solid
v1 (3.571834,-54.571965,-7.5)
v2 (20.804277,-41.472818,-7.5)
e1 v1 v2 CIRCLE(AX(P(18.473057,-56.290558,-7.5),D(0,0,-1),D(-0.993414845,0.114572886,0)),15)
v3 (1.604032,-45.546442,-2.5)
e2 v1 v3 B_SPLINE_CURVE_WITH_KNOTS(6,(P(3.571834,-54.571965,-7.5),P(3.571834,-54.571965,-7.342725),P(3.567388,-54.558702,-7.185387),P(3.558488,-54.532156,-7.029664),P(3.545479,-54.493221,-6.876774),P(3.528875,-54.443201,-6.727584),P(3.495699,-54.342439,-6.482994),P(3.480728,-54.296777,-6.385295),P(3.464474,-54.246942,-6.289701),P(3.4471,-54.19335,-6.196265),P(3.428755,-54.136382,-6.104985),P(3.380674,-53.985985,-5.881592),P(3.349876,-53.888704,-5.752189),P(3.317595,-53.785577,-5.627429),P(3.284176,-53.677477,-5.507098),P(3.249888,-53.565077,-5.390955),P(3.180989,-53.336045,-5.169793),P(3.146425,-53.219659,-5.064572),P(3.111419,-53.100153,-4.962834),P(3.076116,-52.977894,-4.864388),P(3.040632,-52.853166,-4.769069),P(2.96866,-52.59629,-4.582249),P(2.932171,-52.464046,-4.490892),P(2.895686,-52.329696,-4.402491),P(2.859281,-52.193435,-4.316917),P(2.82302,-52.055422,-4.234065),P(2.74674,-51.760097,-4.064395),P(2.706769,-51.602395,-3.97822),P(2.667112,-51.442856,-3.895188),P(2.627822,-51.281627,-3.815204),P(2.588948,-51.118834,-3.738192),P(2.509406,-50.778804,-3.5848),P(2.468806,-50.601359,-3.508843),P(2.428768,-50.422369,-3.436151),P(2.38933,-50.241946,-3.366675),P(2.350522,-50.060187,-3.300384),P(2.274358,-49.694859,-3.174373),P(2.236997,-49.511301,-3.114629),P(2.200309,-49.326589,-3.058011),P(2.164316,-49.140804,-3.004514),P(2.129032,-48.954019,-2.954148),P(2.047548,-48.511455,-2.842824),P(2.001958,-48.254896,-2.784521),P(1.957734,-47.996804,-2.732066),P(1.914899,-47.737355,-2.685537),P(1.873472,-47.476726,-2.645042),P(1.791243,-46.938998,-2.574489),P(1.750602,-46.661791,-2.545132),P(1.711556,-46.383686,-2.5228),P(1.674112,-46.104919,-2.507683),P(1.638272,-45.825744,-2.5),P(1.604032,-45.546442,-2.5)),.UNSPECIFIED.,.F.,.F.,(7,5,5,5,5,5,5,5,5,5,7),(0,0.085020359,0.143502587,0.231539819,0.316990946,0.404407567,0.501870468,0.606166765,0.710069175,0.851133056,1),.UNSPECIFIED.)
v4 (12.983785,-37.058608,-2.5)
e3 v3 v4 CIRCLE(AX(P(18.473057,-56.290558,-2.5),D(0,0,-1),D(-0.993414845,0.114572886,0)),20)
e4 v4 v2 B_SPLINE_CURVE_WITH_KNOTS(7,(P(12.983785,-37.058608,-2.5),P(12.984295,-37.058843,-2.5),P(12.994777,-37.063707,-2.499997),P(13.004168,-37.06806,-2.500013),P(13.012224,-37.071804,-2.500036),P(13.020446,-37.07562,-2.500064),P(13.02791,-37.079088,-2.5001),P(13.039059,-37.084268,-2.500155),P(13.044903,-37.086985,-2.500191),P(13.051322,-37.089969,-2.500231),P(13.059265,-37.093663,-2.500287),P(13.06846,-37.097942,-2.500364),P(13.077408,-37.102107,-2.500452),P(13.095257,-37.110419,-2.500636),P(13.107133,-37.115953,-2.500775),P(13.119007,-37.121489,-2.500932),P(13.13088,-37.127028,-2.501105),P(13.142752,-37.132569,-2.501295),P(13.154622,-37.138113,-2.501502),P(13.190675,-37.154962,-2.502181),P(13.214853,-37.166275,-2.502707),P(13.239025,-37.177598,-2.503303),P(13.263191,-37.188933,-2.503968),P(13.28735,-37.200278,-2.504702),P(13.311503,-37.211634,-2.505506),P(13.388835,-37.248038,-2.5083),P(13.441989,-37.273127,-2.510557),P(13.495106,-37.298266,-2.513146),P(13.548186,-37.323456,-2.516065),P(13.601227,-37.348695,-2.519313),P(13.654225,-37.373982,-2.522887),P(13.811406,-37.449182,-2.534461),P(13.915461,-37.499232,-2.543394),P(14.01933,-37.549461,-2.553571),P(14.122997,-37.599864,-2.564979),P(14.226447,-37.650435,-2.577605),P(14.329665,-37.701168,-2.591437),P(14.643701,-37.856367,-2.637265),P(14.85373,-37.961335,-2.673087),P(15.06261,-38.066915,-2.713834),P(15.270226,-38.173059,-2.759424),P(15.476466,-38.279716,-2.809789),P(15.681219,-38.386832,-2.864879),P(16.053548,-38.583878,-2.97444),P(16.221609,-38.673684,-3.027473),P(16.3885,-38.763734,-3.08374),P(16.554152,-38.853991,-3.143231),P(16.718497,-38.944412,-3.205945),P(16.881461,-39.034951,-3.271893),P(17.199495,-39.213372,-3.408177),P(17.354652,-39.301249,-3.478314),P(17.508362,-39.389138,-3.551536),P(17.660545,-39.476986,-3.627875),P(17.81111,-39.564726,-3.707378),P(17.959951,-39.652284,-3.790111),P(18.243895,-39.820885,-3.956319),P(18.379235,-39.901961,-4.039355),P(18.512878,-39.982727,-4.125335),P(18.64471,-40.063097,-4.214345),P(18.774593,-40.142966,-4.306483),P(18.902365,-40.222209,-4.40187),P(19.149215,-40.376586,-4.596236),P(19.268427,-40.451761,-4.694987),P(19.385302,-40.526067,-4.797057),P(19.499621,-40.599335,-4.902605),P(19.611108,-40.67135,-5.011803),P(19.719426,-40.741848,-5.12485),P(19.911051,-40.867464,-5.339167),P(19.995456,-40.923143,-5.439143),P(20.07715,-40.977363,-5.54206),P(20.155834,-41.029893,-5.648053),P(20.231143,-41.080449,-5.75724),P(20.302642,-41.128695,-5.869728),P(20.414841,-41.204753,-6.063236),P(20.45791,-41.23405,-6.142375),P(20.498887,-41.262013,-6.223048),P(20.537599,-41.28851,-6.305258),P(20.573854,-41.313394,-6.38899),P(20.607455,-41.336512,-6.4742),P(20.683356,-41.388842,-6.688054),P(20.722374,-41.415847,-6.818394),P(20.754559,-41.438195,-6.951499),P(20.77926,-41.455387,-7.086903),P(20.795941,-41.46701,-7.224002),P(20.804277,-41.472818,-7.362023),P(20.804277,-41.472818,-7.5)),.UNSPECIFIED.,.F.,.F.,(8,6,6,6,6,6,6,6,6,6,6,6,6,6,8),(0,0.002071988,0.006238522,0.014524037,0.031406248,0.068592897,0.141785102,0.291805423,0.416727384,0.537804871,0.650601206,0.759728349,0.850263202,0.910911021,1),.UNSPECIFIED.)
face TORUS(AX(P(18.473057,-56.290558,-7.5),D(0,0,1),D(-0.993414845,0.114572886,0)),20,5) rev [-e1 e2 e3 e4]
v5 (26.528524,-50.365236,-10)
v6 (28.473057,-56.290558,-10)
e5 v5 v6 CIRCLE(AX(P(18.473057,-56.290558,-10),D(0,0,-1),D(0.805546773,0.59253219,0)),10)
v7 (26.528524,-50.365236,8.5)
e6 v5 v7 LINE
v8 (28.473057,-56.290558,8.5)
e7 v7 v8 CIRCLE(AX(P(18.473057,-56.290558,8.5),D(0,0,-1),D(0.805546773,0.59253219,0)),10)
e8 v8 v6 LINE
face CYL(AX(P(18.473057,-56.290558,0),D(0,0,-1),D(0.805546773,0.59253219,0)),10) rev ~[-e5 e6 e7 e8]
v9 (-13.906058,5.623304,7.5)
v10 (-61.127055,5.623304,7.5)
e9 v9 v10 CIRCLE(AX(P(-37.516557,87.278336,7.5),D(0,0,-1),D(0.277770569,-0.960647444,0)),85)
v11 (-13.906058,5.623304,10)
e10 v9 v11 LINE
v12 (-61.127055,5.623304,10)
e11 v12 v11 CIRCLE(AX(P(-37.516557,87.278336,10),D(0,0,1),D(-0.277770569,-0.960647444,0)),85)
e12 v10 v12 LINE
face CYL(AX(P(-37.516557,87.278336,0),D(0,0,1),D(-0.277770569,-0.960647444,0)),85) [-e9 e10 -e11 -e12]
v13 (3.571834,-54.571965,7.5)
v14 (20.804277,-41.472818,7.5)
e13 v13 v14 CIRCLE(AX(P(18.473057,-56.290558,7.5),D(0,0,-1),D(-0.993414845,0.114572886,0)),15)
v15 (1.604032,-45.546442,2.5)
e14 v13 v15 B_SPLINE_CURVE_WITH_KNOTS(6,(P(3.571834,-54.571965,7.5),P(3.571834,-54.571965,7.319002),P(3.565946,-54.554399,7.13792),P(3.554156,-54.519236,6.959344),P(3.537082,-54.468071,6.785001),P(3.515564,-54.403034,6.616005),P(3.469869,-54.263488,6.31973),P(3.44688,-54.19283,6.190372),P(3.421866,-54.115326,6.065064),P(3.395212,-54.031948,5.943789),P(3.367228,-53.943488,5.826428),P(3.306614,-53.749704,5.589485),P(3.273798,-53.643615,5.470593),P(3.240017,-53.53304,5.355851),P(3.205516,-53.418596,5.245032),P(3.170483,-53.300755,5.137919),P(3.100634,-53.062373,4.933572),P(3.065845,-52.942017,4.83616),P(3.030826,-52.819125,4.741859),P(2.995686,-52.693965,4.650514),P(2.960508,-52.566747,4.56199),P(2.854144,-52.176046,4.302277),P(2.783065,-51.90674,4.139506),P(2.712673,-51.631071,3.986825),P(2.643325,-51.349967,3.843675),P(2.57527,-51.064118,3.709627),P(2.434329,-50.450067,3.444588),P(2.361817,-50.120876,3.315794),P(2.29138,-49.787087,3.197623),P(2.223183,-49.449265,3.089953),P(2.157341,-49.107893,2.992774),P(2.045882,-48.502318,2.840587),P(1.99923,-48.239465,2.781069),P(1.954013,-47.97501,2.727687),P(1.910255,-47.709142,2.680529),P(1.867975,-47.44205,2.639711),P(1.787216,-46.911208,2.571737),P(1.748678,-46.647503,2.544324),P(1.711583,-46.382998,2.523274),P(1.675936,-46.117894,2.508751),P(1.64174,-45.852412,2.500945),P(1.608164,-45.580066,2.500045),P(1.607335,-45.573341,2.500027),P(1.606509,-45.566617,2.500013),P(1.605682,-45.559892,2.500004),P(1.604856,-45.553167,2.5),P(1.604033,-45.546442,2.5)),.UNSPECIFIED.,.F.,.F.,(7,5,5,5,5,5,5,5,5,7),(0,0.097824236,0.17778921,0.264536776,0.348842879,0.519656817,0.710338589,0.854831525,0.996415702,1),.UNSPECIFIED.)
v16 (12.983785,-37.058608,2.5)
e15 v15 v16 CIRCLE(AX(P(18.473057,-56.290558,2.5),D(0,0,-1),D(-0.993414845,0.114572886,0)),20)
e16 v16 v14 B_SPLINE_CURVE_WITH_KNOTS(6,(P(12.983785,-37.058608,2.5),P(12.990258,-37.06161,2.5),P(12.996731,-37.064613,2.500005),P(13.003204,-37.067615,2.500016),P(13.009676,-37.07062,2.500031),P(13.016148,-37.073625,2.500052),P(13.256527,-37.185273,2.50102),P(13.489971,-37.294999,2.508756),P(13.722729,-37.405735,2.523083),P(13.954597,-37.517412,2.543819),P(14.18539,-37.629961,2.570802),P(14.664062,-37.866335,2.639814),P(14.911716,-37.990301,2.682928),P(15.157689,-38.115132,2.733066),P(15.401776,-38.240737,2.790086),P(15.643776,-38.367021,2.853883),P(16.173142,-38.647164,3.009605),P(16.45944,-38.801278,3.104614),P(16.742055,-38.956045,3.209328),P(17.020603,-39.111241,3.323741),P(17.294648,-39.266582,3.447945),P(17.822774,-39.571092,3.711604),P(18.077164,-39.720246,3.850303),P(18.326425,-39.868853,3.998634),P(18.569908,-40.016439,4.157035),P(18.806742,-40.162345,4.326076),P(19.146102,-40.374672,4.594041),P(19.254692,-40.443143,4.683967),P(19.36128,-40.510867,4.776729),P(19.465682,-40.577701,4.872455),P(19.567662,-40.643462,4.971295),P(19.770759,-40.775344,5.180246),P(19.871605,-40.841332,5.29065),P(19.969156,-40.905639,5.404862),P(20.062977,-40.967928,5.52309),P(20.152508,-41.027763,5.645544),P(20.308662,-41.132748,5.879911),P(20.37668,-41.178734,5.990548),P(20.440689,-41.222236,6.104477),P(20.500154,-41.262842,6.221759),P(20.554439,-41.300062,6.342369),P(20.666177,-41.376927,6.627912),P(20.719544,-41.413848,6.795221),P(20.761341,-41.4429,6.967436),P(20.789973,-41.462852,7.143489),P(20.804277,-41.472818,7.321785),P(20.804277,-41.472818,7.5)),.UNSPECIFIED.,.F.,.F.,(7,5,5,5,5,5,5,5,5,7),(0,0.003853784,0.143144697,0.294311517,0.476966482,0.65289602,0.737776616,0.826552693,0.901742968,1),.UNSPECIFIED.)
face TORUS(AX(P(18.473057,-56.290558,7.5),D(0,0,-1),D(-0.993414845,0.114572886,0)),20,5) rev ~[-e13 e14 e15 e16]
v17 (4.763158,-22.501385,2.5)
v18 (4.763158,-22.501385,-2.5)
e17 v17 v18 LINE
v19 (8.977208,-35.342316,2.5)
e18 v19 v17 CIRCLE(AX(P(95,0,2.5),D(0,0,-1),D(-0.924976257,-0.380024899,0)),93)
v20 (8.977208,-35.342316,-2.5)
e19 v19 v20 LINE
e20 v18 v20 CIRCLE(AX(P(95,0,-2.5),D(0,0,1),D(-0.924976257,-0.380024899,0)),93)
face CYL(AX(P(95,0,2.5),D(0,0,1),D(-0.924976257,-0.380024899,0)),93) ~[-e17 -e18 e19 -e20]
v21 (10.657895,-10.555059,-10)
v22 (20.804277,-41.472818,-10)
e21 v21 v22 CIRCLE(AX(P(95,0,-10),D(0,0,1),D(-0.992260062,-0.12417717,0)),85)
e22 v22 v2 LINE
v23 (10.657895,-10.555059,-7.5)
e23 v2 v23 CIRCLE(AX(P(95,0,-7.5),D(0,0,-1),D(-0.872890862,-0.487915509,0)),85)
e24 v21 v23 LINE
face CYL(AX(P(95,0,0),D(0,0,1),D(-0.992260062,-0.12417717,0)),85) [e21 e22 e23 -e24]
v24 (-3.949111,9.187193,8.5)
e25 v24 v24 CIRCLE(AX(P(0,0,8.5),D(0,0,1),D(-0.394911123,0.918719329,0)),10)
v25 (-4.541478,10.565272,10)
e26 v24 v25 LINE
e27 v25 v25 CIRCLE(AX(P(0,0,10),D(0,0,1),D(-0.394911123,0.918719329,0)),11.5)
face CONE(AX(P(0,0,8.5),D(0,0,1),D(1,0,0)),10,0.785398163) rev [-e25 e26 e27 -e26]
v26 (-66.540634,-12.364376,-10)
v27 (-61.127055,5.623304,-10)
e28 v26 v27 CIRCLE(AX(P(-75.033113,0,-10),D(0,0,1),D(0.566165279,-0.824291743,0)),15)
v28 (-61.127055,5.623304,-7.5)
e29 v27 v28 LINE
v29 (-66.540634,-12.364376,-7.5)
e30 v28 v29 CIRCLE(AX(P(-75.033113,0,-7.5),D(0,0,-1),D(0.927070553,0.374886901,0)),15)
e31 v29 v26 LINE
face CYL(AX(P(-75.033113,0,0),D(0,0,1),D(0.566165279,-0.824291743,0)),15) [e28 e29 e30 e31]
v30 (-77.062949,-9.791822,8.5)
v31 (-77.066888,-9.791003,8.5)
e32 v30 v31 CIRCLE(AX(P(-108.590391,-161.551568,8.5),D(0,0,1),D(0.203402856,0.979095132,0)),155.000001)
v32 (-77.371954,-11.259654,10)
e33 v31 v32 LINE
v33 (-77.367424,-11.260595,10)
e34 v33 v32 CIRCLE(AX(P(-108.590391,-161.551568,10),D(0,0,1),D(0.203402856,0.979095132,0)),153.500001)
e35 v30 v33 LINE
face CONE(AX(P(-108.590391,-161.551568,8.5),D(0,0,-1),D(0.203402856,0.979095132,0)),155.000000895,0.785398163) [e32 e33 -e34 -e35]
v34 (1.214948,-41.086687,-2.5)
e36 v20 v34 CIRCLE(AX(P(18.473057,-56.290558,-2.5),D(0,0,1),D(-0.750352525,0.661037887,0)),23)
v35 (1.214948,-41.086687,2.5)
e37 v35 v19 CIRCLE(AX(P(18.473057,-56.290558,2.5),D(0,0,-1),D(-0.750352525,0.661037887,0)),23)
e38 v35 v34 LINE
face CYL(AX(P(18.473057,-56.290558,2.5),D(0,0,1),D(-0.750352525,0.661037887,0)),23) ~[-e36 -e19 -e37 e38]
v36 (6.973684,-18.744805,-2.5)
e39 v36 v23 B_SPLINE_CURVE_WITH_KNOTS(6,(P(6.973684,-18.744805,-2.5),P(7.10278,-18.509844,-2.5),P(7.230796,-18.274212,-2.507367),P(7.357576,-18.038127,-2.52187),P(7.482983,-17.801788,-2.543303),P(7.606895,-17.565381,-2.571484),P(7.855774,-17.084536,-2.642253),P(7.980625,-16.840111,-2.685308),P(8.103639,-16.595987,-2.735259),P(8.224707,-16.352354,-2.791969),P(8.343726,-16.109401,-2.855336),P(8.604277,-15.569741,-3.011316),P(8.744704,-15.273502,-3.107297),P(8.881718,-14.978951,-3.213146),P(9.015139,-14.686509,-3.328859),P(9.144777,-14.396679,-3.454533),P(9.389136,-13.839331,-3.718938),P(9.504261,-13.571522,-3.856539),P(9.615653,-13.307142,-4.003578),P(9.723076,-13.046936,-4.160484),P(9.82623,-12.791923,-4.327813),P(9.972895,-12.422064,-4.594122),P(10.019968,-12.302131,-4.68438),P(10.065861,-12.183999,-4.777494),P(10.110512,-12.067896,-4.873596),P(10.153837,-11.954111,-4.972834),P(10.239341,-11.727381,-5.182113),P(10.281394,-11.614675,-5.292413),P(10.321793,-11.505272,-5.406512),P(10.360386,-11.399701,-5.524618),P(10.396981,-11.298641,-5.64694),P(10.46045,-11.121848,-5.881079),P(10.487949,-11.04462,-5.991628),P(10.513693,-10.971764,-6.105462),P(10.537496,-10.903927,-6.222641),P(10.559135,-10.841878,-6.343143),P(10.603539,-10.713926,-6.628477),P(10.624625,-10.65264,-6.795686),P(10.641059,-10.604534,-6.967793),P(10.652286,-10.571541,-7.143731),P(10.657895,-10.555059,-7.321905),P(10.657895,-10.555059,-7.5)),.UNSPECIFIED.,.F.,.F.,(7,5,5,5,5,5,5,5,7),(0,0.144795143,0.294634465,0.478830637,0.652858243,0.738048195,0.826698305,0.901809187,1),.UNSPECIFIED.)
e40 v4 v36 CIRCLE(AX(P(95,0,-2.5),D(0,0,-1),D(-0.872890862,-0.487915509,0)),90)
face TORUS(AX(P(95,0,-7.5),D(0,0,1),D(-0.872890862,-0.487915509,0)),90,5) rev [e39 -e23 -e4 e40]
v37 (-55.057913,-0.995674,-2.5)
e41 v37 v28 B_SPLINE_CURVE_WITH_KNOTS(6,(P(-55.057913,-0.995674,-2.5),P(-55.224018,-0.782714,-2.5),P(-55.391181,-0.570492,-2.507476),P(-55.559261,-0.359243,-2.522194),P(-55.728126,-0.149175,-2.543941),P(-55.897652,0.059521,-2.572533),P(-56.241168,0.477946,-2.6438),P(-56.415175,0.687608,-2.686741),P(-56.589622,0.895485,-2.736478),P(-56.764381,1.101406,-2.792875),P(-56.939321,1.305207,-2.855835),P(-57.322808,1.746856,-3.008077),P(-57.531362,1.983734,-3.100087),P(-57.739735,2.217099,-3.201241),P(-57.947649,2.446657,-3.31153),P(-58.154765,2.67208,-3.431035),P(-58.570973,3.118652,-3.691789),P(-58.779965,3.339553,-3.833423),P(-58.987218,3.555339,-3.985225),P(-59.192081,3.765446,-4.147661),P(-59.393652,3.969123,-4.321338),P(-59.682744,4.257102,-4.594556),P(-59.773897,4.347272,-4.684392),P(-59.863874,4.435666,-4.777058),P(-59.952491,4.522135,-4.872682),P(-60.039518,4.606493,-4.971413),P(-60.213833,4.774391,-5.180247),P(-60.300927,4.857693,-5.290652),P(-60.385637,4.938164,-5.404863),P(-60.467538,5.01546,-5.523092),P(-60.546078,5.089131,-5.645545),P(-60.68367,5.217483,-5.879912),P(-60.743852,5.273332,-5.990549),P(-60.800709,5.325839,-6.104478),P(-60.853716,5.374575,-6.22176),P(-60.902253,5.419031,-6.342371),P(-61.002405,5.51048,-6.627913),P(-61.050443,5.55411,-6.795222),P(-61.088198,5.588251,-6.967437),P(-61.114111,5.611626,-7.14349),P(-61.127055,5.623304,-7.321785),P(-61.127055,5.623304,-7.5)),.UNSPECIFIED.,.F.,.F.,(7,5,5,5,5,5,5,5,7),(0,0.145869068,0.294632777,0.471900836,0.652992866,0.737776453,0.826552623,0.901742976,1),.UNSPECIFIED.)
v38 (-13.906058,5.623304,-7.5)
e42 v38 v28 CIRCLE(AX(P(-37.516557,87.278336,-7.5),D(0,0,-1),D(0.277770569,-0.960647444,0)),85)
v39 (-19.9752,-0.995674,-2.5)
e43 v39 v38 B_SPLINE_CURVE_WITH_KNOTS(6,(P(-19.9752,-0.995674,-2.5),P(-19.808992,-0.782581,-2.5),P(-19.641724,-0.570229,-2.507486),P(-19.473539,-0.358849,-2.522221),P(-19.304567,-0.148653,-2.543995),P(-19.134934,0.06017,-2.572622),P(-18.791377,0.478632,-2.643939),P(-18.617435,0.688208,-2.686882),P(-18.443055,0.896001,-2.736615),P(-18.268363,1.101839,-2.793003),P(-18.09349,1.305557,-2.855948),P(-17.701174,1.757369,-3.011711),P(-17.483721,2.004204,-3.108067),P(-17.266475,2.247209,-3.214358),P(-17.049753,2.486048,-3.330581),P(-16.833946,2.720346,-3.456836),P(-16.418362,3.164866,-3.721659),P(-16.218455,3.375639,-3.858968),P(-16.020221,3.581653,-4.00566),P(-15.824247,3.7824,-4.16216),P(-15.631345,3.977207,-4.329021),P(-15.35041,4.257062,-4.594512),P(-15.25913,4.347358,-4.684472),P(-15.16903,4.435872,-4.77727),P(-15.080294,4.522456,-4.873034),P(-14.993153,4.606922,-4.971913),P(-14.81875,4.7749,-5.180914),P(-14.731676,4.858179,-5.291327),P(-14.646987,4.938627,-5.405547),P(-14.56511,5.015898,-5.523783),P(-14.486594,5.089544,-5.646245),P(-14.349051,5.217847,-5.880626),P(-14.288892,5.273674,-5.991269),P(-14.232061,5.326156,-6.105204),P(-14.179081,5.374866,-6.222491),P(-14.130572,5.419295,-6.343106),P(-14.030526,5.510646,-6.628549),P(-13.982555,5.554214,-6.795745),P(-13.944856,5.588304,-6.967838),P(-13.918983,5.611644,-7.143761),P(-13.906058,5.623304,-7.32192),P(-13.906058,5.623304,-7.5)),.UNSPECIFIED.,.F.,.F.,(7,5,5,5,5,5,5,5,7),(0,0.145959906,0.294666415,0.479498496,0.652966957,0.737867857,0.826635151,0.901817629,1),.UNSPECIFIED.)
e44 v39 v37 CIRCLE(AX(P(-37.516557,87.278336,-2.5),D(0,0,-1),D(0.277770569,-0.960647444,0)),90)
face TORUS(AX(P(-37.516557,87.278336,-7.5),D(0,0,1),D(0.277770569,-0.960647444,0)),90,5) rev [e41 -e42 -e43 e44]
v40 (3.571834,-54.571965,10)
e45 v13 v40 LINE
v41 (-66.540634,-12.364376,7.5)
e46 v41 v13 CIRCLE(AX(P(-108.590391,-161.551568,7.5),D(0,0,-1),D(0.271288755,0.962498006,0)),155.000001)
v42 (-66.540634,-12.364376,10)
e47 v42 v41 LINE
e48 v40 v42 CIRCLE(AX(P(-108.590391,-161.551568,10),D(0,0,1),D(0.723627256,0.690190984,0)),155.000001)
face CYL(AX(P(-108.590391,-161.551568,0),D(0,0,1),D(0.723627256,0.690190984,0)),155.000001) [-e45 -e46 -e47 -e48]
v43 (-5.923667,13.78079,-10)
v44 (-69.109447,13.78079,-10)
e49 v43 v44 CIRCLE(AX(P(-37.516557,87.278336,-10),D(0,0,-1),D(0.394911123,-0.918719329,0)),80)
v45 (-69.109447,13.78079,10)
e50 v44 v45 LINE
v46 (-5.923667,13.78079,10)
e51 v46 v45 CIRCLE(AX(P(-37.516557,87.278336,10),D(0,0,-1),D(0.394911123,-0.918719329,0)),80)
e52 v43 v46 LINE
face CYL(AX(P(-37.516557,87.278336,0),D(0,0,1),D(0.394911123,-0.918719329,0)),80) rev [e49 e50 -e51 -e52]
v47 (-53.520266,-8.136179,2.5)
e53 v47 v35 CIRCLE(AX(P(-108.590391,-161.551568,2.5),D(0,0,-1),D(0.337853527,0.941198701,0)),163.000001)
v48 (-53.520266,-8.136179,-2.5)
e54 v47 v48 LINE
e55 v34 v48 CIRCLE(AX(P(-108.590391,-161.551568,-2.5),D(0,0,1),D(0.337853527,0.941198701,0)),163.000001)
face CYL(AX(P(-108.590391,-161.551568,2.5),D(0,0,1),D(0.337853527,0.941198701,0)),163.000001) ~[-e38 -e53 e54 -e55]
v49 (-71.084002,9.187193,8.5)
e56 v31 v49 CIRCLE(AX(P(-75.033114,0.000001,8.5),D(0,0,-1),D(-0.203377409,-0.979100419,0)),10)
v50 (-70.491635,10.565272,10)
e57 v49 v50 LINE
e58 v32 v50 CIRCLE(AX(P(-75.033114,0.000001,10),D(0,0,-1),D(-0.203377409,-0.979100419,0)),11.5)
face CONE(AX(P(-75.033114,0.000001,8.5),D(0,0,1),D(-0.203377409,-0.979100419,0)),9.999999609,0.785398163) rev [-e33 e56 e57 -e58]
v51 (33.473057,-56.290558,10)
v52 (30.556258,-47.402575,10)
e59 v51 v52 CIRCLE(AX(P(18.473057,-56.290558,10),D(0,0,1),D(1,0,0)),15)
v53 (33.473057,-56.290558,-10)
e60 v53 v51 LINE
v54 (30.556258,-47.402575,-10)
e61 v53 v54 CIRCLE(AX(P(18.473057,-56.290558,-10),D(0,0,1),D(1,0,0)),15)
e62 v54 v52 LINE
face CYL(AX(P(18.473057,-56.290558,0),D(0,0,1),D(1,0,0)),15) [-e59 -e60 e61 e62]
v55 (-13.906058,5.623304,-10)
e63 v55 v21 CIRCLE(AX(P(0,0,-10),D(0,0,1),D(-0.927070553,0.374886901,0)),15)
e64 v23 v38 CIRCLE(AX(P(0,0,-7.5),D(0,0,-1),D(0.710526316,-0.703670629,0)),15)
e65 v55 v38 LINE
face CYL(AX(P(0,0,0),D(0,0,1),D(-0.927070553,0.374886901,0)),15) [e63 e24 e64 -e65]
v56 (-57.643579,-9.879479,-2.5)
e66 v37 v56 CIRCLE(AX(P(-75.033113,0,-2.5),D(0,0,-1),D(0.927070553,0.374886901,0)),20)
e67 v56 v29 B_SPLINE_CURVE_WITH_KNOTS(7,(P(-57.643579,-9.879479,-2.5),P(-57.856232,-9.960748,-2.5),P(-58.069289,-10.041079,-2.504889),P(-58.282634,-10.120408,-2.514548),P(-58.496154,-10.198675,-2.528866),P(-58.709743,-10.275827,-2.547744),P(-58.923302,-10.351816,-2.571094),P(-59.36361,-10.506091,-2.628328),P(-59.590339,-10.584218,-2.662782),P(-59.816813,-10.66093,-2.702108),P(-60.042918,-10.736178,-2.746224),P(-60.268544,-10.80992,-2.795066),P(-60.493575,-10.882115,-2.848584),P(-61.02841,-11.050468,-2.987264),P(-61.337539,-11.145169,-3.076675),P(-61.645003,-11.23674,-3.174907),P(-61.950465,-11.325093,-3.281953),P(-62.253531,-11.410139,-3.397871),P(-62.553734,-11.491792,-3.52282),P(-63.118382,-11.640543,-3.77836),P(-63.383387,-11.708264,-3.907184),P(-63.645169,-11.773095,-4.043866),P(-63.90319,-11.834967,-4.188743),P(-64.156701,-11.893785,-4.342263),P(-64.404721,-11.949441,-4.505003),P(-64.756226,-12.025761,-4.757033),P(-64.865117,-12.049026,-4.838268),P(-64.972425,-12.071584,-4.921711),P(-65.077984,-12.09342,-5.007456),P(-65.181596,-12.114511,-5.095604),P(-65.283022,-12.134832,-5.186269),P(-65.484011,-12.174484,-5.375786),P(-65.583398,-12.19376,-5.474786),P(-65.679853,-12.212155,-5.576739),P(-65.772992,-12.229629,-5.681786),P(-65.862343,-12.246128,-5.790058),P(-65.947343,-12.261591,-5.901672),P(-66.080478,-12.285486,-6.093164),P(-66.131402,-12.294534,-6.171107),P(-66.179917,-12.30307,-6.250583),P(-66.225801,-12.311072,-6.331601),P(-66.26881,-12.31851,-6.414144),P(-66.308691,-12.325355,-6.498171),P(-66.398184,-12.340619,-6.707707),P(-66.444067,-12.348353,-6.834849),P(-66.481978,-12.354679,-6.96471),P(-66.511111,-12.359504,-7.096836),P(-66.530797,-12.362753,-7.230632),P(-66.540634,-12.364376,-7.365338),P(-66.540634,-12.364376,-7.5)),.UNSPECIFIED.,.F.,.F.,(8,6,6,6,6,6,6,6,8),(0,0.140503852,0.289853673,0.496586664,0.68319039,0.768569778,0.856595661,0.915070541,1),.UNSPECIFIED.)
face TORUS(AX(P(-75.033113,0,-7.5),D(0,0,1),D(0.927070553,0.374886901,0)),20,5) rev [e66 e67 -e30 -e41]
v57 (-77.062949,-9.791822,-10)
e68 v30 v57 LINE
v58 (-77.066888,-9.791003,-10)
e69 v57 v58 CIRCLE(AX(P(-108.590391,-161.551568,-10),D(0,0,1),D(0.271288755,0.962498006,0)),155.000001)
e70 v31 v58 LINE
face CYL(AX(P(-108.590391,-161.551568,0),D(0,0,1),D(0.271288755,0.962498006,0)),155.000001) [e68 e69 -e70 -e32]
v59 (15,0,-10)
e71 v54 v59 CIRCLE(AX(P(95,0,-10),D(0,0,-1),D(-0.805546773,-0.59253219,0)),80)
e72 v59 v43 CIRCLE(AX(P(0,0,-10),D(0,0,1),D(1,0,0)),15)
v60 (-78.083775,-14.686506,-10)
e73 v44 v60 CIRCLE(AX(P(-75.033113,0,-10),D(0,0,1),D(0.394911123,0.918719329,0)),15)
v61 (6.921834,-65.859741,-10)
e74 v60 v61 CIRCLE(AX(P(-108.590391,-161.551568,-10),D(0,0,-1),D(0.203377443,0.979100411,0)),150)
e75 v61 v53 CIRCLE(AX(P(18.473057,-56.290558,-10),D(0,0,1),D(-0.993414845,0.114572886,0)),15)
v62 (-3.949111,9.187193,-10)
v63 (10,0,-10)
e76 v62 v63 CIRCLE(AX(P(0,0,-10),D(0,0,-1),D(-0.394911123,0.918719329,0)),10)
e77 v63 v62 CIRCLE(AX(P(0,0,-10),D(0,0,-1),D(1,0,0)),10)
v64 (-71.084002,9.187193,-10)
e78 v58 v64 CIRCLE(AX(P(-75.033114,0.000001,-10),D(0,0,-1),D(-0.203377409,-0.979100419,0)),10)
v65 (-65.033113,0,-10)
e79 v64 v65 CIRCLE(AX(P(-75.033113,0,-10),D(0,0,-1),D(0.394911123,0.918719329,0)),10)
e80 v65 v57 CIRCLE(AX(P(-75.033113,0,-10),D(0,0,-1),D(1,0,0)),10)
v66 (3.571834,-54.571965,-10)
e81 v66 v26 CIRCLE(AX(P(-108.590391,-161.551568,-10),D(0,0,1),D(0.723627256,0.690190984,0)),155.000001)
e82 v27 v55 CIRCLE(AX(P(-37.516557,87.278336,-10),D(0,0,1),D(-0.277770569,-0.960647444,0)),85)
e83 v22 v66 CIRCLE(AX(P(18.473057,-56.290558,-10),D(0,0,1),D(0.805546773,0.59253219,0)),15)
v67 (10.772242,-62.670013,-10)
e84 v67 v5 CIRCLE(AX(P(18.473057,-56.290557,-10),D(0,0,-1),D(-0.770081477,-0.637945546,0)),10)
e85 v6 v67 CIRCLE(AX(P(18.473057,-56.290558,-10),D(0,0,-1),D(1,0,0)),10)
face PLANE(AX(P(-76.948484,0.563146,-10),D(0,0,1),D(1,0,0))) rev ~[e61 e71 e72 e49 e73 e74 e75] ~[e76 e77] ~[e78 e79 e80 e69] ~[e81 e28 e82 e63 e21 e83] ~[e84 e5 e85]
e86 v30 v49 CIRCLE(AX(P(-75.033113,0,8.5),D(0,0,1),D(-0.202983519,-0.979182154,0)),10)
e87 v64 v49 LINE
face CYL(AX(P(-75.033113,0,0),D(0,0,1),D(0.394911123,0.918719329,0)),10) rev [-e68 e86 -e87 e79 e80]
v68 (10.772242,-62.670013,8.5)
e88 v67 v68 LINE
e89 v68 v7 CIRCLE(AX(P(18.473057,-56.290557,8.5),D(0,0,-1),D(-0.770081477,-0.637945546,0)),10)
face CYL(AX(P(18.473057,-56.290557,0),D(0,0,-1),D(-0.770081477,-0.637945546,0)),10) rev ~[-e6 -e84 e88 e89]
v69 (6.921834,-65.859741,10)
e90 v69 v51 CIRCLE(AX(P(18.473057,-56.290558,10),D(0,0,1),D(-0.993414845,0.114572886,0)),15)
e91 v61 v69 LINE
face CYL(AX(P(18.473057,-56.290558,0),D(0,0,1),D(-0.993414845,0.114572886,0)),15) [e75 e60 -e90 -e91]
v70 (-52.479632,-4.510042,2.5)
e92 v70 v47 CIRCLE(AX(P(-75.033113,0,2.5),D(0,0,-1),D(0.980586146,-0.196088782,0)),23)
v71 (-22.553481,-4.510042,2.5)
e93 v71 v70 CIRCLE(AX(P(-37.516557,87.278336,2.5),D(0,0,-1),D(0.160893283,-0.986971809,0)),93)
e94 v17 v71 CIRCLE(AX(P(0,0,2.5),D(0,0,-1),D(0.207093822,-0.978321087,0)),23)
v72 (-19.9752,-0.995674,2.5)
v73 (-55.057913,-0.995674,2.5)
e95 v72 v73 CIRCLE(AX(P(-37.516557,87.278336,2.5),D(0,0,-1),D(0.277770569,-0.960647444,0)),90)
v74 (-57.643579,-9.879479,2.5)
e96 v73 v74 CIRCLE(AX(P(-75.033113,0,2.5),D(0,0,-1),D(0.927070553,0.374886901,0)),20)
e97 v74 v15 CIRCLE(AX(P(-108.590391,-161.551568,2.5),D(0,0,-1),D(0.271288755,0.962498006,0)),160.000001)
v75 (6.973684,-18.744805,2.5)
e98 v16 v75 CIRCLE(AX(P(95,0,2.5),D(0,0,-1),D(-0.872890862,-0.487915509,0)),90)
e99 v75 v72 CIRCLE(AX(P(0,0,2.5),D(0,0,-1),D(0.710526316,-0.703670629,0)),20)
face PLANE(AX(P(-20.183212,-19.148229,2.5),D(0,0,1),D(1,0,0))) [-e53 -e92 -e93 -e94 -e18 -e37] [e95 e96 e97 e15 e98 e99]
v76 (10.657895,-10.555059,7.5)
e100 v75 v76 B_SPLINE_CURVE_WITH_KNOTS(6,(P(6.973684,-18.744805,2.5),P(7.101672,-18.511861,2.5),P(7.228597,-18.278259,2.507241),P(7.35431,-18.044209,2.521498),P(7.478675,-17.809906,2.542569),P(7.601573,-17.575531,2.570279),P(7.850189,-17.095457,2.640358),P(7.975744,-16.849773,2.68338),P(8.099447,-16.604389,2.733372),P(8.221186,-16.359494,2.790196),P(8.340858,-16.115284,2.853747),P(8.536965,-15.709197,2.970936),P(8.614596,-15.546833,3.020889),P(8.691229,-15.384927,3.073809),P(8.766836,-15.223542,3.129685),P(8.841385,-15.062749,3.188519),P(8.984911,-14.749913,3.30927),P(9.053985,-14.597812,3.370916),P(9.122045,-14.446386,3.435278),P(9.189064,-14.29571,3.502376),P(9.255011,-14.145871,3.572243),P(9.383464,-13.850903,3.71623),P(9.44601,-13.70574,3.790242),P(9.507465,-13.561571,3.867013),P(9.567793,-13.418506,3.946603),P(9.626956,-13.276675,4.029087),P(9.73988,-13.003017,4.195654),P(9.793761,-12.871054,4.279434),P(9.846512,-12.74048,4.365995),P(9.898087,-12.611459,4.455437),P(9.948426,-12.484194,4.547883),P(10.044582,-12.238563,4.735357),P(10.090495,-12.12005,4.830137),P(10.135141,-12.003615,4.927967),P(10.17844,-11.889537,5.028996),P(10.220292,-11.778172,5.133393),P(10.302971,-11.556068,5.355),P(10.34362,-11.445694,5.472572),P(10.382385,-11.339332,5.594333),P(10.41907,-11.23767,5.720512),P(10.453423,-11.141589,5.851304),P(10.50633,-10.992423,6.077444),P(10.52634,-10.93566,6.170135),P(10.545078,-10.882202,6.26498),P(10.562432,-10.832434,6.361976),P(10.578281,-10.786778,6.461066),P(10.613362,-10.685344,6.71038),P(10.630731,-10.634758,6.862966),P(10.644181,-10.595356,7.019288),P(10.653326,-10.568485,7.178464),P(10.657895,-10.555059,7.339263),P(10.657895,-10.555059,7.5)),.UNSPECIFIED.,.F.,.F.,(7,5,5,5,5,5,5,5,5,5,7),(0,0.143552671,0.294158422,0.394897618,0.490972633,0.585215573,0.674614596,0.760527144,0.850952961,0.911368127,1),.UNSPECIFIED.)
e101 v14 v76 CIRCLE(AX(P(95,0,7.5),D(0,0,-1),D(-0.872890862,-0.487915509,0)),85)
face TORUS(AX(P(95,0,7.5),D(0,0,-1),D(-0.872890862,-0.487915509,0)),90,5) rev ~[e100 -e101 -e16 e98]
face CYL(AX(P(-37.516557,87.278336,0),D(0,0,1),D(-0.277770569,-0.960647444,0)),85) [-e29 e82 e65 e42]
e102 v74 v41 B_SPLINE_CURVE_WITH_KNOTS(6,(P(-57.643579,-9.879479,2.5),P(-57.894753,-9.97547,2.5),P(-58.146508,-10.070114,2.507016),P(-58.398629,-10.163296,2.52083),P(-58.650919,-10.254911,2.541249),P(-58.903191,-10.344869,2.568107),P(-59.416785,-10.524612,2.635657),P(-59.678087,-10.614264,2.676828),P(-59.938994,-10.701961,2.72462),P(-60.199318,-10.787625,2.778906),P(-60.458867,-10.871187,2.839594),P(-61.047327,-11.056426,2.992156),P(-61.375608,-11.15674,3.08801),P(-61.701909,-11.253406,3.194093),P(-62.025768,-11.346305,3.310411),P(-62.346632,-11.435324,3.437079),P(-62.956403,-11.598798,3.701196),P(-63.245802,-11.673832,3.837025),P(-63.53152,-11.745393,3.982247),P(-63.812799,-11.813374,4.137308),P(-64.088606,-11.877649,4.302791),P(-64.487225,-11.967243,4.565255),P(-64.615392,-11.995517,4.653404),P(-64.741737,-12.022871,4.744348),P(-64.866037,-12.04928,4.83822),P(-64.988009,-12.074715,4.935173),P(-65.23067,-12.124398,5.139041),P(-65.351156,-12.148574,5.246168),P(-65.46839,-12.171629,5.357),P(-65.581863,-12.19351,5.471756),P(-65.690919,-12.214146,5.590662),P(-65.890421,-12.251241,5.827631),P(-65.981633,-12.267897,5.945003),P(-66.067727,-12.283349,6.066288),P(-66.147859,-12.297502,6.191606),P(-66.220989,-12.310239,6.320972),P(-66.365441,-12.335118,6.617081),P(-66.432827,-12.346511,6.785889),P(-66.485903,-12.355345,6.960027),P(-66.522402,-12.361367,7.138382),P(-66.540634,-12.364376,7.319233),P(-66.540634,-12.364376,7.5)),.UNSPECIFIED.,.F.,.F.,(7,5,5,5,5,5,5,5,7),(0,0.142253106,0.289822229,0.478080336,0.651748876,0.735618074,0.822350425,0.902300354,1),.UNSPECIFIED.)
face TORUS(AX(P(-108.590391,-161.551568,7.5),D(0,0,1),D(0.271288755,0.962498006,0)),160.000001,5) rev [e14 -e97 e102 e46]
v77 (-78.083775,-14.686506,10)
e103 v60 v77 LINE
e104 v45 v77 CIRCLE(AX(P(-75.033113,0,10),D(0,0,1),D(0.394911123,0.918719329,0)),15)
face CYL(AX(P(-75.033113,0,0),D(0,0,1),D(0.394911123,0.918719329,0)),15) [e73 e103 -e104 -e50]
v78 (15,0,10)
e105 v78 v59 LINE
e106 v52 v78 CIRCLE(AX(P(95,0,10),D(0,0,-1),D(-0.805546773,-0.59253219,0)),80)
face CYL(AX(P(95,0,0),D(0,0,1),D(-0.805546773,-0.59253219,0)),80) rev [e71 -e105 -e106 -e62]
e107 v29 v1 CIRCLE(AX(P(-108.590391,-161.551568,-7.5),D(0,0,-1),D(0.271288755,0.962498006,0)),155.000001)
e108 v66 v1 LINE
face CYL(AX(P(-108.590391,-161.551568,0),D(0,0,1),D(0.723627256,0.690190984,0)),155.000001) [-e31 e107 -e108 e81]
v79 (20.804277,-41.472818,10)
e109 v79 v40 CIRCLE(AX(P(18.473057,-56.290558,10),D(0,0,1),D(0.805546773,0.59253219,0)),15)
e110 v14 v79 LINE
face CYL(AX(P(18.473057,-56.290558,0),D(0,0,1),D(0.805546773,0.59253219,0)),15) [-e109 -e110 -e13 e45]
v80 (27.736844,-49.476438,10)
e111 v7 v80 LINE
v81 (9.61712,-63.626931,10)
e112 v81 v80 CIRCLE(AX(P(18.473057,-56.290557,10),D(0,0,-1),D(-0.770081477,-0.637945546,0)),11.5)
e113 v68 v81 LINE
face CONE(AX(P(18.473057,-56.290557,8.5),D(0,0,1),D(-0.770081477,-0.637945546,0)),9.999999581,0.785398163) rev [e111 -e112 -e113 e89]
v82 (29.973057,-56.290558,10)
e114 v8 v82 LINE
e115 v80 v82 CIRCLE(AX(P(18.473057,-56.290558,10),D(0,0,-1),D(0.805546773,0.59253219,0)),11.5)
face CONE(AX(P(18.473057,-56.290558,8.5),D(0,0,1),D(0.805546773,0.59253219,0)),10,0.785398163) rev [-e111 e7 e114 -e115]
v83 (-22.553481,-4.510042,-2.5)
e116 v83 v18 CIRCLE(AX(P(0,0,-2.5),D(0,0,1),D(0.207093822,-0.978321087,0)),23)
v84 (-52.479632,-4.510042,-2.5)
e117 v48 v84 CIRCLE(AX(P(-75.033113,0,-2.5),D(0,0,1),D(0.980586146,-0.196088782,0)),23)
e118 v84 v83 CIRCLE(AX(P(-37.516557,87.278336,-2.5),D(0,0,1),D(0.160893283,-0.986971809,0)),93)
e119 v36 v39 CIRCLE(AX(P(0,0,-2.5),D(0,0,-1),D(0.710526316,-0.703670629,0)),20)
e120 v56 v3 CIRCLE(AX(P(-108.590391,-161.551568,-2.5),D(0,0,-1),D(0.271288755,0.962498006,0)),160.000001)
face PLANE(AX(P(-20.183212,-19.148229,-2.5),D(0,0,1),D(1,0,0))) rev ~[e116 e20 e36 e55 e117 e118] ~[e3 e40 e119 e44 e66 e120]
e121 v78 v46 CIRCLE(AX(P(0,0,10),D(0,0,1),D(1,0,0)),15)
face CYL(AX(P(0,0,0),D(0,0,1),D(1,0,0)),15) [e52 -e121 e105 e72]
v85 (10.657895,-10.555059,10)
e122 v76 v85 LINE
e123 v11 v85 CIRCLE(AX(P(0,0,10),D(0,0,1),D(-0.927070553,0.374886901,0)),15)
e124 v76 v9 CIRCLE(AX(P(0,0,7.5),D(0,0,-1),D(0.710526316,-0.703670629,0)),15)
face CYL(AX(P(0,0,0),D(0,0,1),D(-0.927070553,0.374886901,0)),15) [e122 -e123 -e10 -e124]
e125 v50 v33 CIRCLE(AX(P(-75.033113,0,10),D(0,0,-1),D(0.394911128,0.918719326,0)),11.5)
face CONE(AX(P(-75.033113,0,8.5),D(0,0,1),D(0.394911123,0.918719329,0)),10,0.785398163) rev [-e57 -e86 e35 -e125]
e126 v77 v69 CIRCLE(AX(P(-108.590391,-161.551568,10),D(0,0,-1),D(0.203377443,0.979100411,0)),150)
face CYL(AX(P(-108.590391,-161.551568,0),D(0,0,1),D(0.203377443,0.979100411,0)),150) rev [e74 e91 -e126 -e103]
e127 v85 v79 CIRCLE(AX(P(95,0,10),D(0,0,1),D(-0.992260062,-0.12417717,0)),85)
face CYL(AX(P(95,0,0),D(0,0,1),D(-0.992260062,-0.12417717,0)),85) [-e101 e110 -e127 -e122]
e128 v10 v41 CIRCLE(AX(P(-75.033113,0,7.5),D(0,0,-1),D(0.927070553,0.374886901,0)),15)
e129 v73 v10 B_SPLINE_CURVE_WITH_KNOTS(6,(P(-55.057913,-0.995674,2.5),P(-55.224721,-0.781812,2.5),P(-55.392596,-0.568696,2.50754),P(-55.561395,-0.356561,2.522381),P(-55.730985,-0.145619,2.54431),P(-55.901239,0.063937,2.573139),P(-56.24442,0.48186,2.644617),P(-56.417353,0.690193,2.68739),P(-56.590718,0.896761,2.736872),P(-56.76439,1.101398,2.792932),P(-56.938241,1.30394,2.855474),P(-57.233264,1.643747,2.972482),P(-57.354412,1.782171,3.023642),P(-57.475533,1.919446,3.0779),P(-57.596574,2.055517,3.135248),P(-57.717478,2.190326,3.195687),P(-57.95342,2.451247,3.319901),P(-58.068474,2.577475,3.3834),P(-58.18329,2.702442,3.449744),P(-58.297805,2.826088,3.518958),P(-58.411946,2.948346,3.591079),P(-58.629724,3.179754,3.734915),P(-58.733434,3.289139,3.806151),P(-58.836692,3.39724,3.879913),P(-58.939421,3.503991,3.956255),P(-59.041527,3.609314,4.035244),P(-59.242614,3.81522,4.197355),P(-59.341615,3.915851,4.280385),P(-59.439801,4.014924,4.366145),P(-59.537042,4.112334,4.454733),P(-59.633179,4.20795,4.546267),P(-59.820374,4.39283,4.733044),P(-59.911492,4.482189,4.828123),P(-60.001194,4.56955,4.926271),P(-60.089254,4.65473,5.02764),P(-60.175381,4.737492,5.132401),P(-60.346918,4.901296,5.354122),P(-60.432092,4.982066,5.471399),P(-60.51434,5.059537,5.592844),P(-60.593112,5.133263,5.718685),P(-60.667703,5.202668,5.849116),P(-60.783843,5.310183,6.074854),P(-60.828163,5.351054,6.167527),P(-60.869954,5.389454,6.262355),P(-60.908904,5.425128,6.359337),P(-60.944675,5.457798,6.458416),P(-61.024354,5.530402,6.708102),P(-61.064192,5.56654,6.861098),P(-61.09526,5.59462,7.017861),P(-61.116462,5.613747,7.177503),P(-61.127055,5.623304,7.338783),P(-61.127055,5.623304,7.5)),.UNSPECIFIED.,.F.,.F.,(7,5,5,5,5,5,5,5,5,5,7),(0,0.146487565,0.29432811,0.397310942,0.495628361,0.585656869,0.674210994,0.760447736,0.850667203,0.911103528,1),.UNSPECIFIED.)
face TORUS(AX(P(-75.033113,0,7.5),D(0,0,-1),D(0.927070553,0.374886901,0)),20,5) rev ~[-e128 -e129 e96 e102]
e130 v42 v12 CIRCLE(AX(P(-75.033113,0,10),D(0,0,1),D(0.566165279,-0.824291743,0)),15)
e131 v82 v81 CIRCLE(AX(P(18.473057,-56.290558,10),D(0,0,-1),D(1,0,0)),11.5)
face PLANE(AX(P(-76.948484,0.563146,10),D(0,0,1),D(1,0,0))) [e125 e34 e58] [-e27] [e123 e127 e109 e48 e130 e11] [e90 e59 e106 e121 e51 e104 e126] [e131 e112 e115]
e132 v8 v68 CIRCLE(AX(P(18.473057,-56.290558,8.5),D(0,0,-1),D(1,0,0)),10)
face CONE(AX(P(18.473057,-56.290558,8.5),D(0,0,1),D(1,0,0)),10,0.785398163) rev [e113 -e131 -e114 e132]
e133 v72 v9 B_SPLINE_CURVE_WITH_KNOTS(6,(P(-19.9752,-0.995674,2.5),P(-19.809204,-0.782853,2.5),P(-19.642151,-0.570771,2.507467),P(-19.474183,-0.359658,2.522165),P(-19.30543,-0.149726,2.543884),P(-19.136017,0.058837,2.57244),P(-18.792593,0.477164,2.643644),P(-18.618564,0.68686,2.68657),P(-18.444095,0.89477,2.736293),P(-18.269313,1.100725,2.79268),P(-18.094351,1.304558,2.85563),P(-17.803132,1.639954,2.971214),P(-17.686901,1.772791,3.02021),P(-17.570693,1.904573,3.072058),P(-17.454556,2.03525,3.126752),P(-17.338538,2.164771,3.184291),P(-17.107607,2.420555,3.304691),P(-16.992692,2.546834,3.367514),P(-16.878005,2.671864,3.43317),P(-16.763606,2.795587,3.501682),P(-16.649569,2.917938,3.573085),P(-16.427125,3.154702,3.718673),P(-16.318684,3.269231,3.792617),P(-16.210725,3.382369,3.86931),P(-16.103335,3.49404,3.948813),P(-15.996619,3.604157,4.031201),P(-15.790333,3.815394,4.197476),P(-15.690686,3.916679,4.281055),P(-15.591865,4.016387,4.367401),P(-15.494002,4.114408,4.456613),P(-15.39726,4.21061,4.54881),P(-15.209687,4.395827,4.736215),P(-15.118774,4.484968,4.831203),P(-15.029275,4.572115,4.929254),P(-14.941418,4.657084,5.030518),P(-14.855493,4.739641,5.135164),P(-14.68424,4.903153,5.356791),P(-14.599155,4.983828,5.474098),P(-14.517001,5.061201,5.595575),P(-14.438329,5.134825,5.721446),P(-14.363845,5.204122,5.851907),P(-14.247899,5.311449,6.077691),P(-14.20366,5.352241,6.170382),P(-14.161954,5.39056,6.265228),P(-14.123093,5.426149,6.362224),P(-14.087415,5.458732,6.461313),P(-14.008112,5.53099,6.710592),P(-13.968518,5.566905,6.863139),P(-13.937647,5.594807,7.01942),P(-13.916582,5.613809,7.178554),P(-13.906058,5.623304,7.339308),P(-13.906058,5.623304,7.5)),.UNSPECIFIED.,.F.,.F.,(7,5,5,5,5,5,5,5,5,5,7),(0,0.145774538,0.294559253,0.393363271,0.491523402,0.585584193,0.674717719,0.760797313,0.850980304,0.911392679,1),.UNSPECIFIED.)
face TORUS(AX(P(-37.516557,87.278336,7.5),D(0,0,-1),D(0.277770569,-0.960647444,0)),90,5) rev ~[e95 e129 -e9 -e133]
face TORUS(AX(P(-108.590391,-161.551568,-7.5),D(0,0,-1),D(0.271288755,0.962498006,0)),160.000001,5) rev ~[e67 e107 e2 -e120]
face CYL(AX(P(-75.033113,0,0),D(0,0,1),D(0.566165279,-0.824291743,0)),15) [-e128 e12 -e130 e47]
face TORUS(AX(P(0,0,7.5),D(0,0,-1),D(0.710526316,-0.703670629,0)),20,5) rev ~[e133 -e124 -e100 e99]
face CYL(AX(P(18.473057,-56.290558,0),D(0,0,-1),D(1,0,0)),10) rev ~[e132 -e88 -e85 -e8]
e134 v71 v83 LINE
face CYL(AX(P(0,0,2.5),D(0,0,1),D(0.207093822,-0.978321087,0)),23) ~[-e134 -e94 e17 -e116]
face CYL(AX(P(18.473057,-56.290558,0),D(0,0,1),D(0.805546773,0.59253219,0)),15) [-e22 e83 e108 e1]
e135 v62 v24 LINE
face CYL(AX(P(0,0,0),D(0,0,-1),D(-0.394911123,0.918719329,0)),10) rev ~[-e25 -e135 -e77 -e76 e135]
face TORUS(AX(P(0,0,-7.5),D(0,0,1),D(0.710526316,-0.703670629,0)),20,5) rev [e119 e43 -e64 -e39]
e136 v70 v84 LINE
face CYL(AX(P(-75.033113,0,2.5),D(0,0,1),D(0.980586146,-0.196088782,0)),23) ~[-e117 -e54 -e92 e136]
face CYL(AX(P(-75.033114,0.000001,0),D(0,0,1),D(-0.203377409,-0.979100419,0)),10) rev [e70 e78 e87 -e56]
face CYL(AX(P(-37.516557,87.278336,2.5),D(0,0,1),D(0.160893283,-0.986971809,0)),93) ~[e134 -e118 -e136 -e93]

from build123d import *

# Parameters (mm, degrees)
F1_DEPTH = 10
F2_DEPTH = 2.5
F3_R     = 5
F5_DEPTH = 12.501
F6_SIZE  = 1.5


# Not quite as in the source:
# - ends of sketch curves that miss each other by under 0.0002 mm in the source are joined


with BuildPart() as f1:
    # F0 (on Top) → F1 (new body, symmetric)
    with BuildSketch(Plane.XY):
        with BuildLine():
            ThreePointArc((-61.1270550584, 5.6233035221), (-64.3120758187, 10.4909176924), (-69.1094465162, 13.7807899309))
            ThreePointArc((-69.1094465162, 13.7807899309), (-89.3390658482, 4.5099582499), (-78.083775001, -14.6865061725))
            ThreePointArc((-78.083775001, -14.6865061725), (-72.0748340452, -14.7053930071), (-66.5406341793, -12.3643761411))
            ThreePointArc((-66.5406341793, -12.3643761411), (-71.7812655501, -10.9856736162), (-77.0668876123, -9.7910032715))
            ThreePointArc((-77.0668876123, -9.7910032715), (-84.570415019, 3.0066388333), (-71.0840021309, 9.1871932872))
            ThreePointArc((-71.0840021309, 9.1871932872), (-66.1610088951, 7.2502451775), (-61.1270550584, 5.6233035221))
        make_face()
        with BuildLine():
            ThreePointArc((-60.0331133604, 0), (-60.3091384465, 2.8643607899), (-61.1270550584, 5.6233035221))
            ThreePointArc((-61.1270550584, 5.6233035221), (-66.1610088951, 7.2502451775), (-71.0840021309, 9.1871932872))
            ThreePointArc((-71.0840021309, 9.1871932872), (-66.6817328669, 5.5004039718), (-65.0331133604, 0))
            ThreePointArc((-65.0331133604, 0), (-68.7219226752, -7.7568596826), (-77.0668877875, -9.791004115))
            ThreePointArc((-77.0668877875, -9.791004115), (-71.7812655501, -10.9856736162), (-66.5406341793, -12.3643761411))
            ThreePointArc((-66.5406341793, -12.3643761411), (-61.7593198612, -6.9861581818), (-60.0331133604, 0))
        make_face()
        with BuildLine():
            ThreePointArc((-13.906058302, 5.6233035221), (-8.2506059576, -12.5270707403), (10.6578947368, -10.5550594398))
            ThreePointArc((10.6578947368, -10.5550594398), (10.1646331199, -5.2877713941), (10, 0))
            ThreePointArc((10, 0), (-5.5004039718, -8.3513804935), (-3.9491112295, 9.1871932872))
            ThreePointArc((-3.9491112295, 9.1871932872), (-8.8721044653, 7.2502451775), (-13.906058302, 5.6233035221))
        make_face()
        with BuildLine():
            ThreePointArc((10.6578947368, -10.5550594398), (13.8720658348, -5.7066443269), (15, 0))
            ThreePointArc((15, 0), (8.2506059576, 12.5270707403), (-5.9236668442, 13.7807899309))
            ThreePointArc((-5.9236668442, 13.7807899309), (-10.7210375417, 10.4909176924), (-13.906058302, 5.6233035221))
            ThreePointArc((-13.906058302, 5.6233035221), (-8.8721044653, 7.2502451775), (-3.9491112295, 9.1871932872))
            ThreePointArc((-3.9491112295, 9.1871932872), (5.5004039718, 8.3513804935), (10, 0))
            ThreePointArc((10, 0), (10.1646331199, -5.2877713941), (10.6578947368, -10.5550594398))
        make_face()
        with BuildLine():
            ThreePointArc((26.5285242746, -50.3652361455), (23.527969189, -46.0081385383), (20.8042767721, -41.4728182632))
            ThreePointArc((20.8042767721, -41.4728182632), (9.3957138654, -44.3489563966), (3.5718338704, -54.5719647583))
            ThreePointArc((3.5718338704, -54.5719647583), (7.2428277606, -58.5580457504), (10.7722421784, -62.6700126379))
            ThreePointArc((10.7722421784, -62.6700126379), (12.3181130698, -48.4091450465), (26.5285242746, -50.3652361455))
        make_face()
        with BuildLine():
            ThreePointArc((33.4730565422, -56.2905580449), (32.7252146942, -51.6133806899), (30.5562581408, -47.4025751957))
            ThreePointArc((30.5562581408, -47.4025751957), (26.2662839534, -43.4739435732), (20.8042767721, -41.4728182632))
            ThreePointArc((20.8042767721, -41.4728182632), (23.527969189, -46.0081385383), (26.5285242746, -50.3652361455))
            ThreePointArc((26.5285242746, -50.3652361455), (27.9744953102, -53.1724398082), (28.4730565422, -56.2905580449))
            ThreePointArc((28.4730565422, -56.2905580449), (21.8636206345, -65.6982184946), (10.772241515, -62.6700131875))
            ThreePointArc((10.772241515, -62.6700131875), (7.2428277606, -58.5580457504), (3.5718338704, -54.5719647583))
            ThreePointArc((3.5718338704, -54.5719647583), (4.0929857429, -60.5582932532), (6.9218340013, -65.8597407588))
            ThreePointArc((6.9218340013, -65.8597407588), (23.5589026806, -70.4020487194), (33.4730565422, -56.2905580449))
        make_face()
        with BuildLine():
            ThreePointArc((-66.5406341793, -12.3643761411), (-72.0748340452, -14.7053930071), (-78.083775001, -14.6865061725))
            ThreePointArc((-78.083775001, -14.6865061725), (-31.2272831079, -33.0410645358), (6.9218340013, -65.8597407588))
            ThreePointArc((6.9218340013, -65.8597407588), (4.0929857429, -60.5582932532), (3.5718338704, -54.5719647583))
            ThreePointArc((3.5718338704, -54.5719647583), (-28.6485123869, -28.7573803523), (-66.5406341793, -12.3643761411))
        make_face()
        with BuildLine():
            ThreePointArc((-13.906058302, 5.6233035221), (-10.7210375417, 10.4909176924), (-5.9236668442, 13.7807899309))
            ThreePointArc((-5.9236668442, 13.7807899309), (-37.5165566802, 7.2783362288), (-69.1094465162, 13.7807899309))
            ThreePointArc((-69.1094465162, 13.7807899309), (-64.3120758187, 10.4909176924), (-61.1270550584, 5.6233035221))
            ThreePointArc((-61.1270550584, 5.6233035221), (-37.5165566802, 2.2783362288), (-13.906058302, 5.6233035221))
        make_face()
        with BuildLine():
            ThreePointArc((30.5562581408, -47.4025751957), (18.988489856, -24.9449458936), (15, 0))
            ThreePointArc((15, 0), (13.8720658348, -5.7066443269), (10.6578947368, -10.5550594398))
            ThreePointArc((10.6578947368, -10.5550594398), (14.237770472, -26.5040050119), (20.8042767721, -41.4728182632))
            ThreePointArc((20.8042767721, -41.4728182632), (26.2662839534, -43.4739435732), (30.5562581408, -47.4025751957))
        make_face()
    extrude(amount=F1_DEPTH, both=True)

    # F0 (on Top) → F2 (join, symmetric)
    with BuildSketch(Plane.XY):
        with BuildLine():
            ThreePointArc((20.8042767721, -41.4728182632), (14.237770472, -26.5040050119), (10.6578947368, -10.5550594398))
            ThreePointArc((10.6578947368, -10.5550594398), (-8.2506059576, -12.5270707403), (-13.906058302, 5.6233035221))
            ThreePointArc((-13.906058302, 5.6233035221), (-37.5165566802, 2.2783362288), (-61.1270550584, 5.6233035221))
            ThreePointArc((-61.1270550584, 5.6233035221), (-60.3091384465, 2.8643607899), (-60.0331133604, 0))
            ThreePointArc((-60.0331133604, 0), (-61.7593198612, -6.9861581818), (-66.5406341793, -12.3643761411))
            ThreePointArc((-66.5406341793, -12.3643761411), (-28.6485123869, -28.7573803523), (3.5718338704, -54.5719647583))
            ThreePointArc((3.5718338704, -54.5719647583), (9.3957138654, -44.3489563966), (20.8042767721, -41.4728182632))
        make_face()
    extrude(amount=F2_DEPTH, both=True)

    # F3
    f3_edges = [f1.edges().sort_by_distance(p)[0] for p in [
        (14.23777, -26.504005, 2.5),
        (-8.250606, -12.527071, 2.5),
        (-37.516557, 2.278336, 2.5),
        (-60.669521, -4.322872, 2.5),
        (-28.648512, -28.75738, 2.5),
        (9.395714, -44.348956, 2.5),
        (14.23777, -26.504005, -2.5),
        (-8.250606, -12.527071, -2.5),
        (-37.516557, 2.278336, -2.5),
        (-60.669521, -4.322872, -2.5),
        (-28.648512, -28.75738, -2.5),
        (9.395714, -44.348956, -2.5),
    ]]
    fillet(f3_edges, radius=F3_R)

    # F4 (on face) → F5 (cut, through all)
    with BuildSketch(Plane.XY.offset(2.5)):
        with BuildLine():
            ThreePointArc((4.7631578947, -22.5013849989), (-12.650929135, -19.2081751351), (-22.5534813546, -4.5100419942))
            ThreePointArc((-22.5534813546, -4.5100419942), (-37.5165566802, -5.7216637712), (-52.4796320058, -4.5100419942))
            ThreePointArc((-52.4796320058, -4.5100419942), (-52.9254779245, -6.3444822825), (-53.5202661907, -8.1361788731))
            ThreePointArc((-53.5202661907, -8.1361788731), (-24.5224799443, -21.9034868397), (1.2149484666, -41.0866866415))
            ThreePointArc((1.2149484666, -41.0866866415), (4.7912073526, -37.8025348204), (8.9772080845, -35.3423155872))
            ThreePointArc((8.9772080845, -35.3423155872), (6.6366194576, -28.9984996013), (4.7631578947, -22.5013849989))
        make_face()
    extrude(amount=-F5_DEPTH, mode=Mode.SUBTRACT)

    # F6
    f6_edges = [f1.edges().sort_by_distance(p)[0] for p in [
        (-84.570415, 3.006639, 10),
        (3.949111, -9.187193, 10),
        (12.318113, -48.409145, 10),
    ]]
    chamfer(f6_edges, length=F6_SIZE)


solid = f1.part
